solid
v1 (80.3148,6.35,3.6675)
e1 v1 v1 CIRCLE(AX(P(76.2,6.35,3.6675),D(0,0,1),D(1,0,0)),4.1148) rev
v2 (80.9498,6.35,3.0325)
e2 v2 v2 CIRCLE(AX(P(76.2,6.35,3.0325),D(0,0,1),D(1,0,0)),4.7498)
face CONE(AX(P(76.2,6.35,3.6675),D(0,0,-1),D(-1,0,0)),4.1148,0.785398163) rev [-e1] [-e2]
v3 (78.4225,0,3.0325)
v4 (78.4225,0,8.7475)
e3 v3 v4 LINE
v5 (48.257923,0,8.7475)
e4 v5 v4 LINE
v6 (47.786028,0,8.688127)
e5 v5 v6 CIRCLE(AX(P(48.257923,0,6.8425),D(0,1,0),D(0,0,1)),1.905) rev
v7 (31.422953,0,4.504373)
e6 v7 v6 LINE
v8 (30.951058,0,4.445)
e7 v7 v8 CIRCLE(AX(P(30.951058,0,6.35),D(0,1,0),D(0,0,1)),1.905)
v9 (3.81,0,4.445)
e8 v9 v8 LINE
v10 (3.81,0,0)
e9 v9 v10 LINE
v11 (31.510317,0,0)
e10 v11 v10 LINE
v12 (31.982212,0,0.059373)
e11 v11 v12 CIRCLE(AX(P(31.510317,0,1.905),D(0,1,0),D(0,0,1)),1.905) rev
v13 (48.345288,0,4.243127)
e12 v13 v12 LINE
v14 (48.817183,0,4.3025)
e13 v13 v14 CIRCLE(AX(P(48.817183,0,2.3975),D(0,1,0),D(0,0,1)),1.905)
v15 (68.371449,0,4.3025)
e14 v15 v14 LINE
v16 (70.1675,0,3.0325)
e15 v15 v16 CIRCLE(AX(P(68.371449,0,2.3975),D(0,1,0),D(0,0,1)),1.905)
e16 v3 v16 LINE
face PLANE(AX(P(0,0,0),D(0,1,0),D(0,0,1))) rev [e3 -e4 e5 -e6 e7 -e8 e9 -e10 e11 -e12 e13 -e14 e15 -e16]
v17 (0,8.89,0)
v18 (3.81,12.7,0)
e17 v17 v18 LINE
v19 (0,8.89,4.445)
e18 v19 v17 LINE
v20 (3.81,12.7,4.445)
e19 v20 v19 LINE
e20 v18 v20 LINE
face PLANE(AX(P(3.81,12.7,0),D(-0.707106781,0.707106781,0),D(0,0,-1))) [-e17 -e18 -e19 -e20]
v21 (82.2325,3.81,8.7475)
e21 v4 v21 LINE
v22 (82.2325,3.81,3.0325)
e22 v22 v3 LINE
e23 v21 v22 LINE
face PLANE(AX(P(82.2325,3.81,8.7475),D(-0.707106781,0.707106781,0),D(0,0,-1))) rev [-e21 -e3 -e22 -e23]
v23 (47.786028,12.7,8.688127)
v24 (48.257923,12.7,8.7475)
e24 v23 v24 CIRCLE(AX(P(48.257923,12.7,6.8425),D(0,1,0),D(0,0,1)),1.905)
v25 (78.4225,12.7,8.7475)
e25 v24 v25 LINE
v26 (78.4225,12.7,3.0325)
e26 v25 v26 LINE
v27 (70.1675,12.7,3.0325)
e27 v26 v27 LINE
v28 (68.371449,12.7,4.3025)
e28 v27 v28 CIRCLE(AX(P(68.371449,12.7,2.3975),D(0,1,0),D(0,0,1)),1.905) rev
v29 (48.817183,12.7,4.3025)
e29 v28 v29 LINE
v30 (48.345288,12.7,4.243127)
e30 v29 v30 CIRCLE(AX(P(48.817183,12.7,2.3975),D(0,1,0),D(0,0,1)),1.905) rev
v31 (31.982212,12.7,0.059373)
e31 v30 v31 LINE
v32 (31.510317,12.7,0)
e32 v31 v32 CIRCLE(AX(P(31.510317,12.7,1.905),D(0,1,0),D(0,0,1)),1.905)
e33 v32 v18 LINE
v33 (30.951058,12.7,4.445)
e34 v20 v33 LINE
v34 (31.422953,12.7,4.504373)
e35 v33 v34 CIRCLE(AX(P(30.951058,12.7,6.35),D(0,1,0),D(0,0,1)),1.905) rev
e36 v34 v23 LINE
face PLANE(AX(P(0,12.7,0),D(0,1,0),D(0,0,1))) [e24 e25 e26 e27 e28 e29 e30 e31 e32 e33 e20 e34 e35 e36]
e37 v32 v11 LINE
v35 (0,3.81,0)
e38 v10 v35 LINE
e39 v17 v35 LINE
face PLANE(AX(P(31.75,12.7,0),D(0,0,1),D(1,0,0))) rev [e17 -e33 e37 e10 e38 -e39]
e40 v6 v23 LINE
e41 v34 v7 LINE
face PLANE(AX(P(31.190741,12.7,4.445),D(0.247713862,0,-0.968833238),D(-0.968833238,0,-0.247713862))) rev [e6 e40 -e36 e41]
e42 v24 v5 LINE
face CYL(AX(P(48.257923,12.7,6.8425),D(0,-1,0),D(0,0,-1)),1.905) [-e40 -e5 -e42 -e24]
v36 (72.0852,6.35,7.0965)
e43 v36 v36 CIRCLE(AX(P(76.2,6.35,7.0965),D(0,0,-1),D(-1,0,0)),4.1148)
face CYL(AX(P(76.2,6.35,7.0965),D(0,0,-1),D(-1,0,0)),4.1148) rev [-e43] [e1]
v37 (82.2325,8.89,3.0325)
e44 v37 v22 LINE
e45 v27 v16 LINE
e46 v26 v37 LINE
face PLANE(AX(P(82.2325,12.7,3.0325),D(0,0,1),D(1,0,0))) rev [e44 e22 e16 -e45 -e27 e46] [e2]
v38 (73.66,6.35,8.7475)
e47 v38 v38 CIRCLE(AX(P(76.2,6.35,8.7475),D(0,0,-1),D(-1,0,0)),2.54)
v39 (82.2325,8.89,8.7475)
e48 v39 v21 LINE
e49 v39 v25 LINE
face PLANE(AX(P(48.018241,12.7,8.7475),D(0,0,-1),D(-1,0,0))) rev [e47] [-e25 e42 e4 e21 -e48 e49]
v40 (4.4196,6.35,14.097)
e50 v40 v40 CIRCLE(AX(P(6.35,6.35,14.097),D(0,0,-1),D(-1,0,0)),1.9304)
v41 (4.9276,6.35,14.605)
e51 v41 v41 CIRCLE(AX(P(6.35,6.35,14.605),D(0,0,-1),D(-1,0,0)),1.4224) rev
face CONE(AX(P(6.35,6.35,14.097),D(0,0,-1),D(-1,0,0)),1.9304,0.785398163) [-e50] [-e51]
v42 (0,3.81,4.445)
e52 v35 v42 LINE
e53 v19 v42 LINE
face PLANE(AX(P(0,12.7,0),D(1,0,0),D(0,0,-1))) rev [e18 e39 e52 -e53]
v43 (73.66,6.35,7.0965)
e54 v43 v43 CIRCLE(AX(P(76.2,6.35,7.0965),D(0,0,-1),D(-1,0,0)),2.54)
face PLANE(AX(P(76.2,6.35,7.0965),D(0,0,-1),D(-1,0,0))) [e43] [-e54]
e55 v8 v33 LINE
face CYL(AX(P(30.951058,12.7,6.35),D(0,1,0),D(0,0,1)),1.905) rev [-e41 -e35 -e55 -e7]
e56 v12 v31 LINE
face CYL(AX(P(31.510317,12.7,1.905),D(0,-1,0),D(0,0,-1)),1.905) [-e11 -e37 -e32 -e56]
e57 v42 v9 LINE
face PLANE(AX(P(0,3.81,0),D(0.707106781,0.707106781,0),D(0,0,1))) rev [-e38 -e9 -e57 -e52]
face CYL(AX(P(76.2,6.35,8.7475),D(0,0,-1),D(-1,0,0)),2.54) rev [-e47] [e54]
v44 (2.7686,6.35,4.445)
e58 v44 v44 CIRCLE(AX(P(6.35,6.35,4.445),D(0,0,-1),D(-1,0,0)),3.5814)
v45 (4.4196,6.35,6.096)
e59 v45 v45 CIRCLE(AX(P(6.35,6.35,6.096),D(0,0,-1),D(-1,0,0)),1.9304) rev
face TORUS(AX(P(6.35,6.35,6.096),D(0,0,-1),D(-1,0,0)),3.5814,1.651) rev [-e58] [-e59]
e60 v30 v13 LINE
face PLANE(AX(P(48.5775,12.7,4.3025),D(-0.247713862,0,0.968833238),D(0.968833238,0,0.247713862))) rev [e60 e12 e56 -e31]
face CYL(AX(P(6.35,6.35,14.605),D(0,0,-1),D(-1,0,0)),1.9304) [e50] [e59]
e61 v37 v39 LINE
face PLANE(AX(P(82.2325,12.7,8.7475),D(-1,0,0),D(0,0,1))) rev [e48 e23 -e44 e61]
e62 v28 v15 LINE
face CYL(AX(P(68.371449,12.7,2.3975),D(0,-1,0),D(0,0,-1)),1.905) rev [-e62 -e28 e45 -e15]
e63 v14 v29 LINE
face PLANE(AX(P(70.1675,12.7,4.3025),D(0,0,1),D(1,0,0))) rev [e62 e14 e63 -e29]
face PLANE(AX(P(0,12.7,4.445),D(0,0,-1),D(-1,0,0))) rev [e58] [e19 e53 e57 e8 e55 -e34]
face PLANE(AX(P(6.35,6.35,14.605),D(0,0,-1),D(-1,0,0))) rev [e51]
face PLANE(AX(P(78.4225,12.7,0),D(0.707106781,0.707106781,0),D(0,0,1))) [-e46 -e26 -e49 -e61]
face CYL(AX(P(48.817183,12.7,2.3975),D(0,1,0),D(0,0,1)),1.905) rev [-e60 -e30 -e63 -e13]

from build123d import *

# Parameters (mm, degrees)
BOSS_EXTRUDE1_DEPTH = 12.7
SKETCH2_R           = 4.1148
CUT_EXTRUDE1_DEPTH  = 4.064
SKETCH3_R           = 2.54
CUT_EXTRUDE2_DEPTH  = 84.509486698
SKETCH4_R           = 1.9304
BOSS_EXTRUDE2_DEPTH = 10.16
FILLET1_R           = 1.651
CHAMFER1_SIZE       = 3.81
FILLET2_R           = 1.905
CHAMFER2_SIZE       = 0.635
CHAMFER3_SIZE       = 0.508


with BuildPart() as part:
    # Sketch1 → Boss-Extrude1 (new body)
    with BuildSketch(Plane(origin=(0, 0, 0), x_dir=(1, 0, 0), z_dir=(0, 1, 0))):
        Polygon((0, 0), (0, -4.445), (31.190740793, -4.445), (48.018240793, -8.7475), (82.2325, -8.7475), (82.2325, -3.0325), (70.1675, -3.0325), (70.1675, -4.3025), (48.5775, -4.3025), (31.75, 0), align=None)
    extrude(amount=BOSS_EXTRUDE1_DEPTH)

    # Sketch2 → Cut-Extrude1 (cut)
    with BuildSketch(Plane(origin=(0, 0, 3.0325), x_dir=(-1, 0, 0), z_dir=(0, 0, -1))):
        with Locations((-76.2, 6.35)):
            Circle(SKETCH2_R)
    extrude(amount=-CUT_EXTRUDE1_DEPTH, mode=Mode.SUBTRACT)

    # Sketch3 → Cut-Extrude2 (cut, through all)
    with BuildSketch(Plane(origin=(0, 0, 7.0965), x_dir=(-1, 0, 0), z_dir=(0, 0, -1))):
        with Locations((-76.2, 6.35)):
            Circle(SKETCH3_R)
    extrude(amount=-CUT_EXTRUDE2_DEPTH, mode=Mode.SUBTRACT)

    # Sketch4 → Boss-Extrude2 (add)
    with BuildSketch(Plane(origin=(0, 0, 4.445), x_dir=(-1, 0, 0), z_dir=(0, 0, -1))):
        with Locations((-6.35, 6.35)):
            Circle(SKETCH4_R)
    extrude(amount=-BOSS_EXTRUDE2_DEPTH)

    # Fillet1
    fillet1_edges = [part.edges().sort_by_distance(p)[0] for p in [
        (8.2804, 6.35, 4.445),
    ]]
    fillet(fillet1_edges, radius=FILLET1_R)

    # Chamfer1
    chamfer1_edges = [part.edges().sort_by_distance(p)[0] for p in [
        (82.2325, 0, 5.89),
        (0, 0, 2.2225),
        (82.2325, 12.7, 5.89),
        (0, 12.7, 2.2225),
    ]]
    chamfer(chamfer1_edges, length=CHAMFER1_SIZE)

    # Fillet2
    # the kernel refuses this fillet: 1.905 mm, written as the material it adds along each edge
    with BuildSketch(Plane(origin=(31.190740793, 0, 4.445), x_dir=(-1, 0, 0), z_dir=(0, 1, 0))) as fillet2_piece_1:
        with BuildLine():
            CenterArc((FILLET2_R * 0.125817594312, FILLET2_R), FILLET2_R, 255.657728572, 14.342271428)
            Line((-FILLET2_R * 0.121896267277, FILLET2_R * 0.0311667621428), (0, 0))
            Line((0, 0), (FILLET2_R * 0.125817594312, 0))
        make_face()
    extrude(amount=12.7)
    with BuildSketch(Plane(origin=(48.5775, 0, 4.3025), x_dir=(-0.96883323785722, 0, -0.24771386158851796), z_dir=(0, 1, 0))) as fillet2_piece_2:
        with BuildLine():
            CenterArc((FILLET2_R * 0.125817594312, -FILLET2_R), FILLET2_R, 90, 14.342271428)
            Line((-FILLET2_R * 0.121896267277, -FILLET2_R * 0.0311667621428), (0, 0))
            Line((0, 0), (FILLET2_R * 0.125817594312, 0))
        make_face()
    extrude(amount=12.7)
    with BuildSketch(Plane(origin=(70.1675, 0, 4.3025), x_dir=(-1, 0, 0), z_dir=(0, 1, 0))) as fillet2_piece_3:
        with BuildLine():
            CenterArc((1.796051224, -1.905), FILLET2_R, 90, 70.528779366)
            Line((0, -1.27), (0, 0))
            Line((0, 0), (1.796051224, 0))
        make_face()
    extrude(amount=12.7)
    # the kernel refuses this fillet: 1.905 mm, written as the material it takes off along each edge
    with BuildSketch(Plane(origin=(48.018240793, -0.599206293, 8.7475), x_dir=(-0.96883323785722, 0, -0.24771386158851796), z_dir=(0, 1, 0))) as fillet2_2_piece_1:
        with BuildLine():
            CenterArc((FILLET2_R * 0.125817594312, -FILLET2_R), FILLET2_R, 90, 14.342271428)
            Line((-FILLET2_R * 0.121896267277, -FILLET2_R * 0.0311667621428), (0, 0))
            Line((0, 0), (FILLET2_R * 0.125817594312, 0))
        make_face()
    extrude(amount=13.898412586, mode=Mode.SUBTRACT)
    with BuildSketch(Plane(origin=(31.75, -0.599206293, 0), x_dir=(-1, 0, 0), z_dir=(0, 1, 0))) as fillet2_2_piece_2:
        with BuildLine():
            CenterArc((FILLET2_R * 0.125817594312, FILLET2_R), FILLET2_R, 255.657728572, 14.342271428)
            Line((-FILLET2_R * 0.121896267277, FILLET2_R * 0.0311667621428), (0, 0))
            Line((0, 0), (FILLET2_R * 0.125817594312, 0))
        make_face()
    extrude(amount=13.898412586, mode=Mode.SUBTRACT)

    # Chamfer2
    chamfer2_edges = [part.edges().sort_by_distance(p)[0] for p in [
        (80.3148, 6.35, 3.0325),
    ]]
    chamfer(chamfer2_edges, length=CHAMFER2_SIZE)

    # Chamfer3
    chamfer3_edges = [part.edges().sort_by_distance(p)[0] for p in [
        (8.2804, 6.35, 14.605),
    ]]
    chamfer(chamfer3_edges, length=CHAMFER3_SIZE)


solid = part.part
